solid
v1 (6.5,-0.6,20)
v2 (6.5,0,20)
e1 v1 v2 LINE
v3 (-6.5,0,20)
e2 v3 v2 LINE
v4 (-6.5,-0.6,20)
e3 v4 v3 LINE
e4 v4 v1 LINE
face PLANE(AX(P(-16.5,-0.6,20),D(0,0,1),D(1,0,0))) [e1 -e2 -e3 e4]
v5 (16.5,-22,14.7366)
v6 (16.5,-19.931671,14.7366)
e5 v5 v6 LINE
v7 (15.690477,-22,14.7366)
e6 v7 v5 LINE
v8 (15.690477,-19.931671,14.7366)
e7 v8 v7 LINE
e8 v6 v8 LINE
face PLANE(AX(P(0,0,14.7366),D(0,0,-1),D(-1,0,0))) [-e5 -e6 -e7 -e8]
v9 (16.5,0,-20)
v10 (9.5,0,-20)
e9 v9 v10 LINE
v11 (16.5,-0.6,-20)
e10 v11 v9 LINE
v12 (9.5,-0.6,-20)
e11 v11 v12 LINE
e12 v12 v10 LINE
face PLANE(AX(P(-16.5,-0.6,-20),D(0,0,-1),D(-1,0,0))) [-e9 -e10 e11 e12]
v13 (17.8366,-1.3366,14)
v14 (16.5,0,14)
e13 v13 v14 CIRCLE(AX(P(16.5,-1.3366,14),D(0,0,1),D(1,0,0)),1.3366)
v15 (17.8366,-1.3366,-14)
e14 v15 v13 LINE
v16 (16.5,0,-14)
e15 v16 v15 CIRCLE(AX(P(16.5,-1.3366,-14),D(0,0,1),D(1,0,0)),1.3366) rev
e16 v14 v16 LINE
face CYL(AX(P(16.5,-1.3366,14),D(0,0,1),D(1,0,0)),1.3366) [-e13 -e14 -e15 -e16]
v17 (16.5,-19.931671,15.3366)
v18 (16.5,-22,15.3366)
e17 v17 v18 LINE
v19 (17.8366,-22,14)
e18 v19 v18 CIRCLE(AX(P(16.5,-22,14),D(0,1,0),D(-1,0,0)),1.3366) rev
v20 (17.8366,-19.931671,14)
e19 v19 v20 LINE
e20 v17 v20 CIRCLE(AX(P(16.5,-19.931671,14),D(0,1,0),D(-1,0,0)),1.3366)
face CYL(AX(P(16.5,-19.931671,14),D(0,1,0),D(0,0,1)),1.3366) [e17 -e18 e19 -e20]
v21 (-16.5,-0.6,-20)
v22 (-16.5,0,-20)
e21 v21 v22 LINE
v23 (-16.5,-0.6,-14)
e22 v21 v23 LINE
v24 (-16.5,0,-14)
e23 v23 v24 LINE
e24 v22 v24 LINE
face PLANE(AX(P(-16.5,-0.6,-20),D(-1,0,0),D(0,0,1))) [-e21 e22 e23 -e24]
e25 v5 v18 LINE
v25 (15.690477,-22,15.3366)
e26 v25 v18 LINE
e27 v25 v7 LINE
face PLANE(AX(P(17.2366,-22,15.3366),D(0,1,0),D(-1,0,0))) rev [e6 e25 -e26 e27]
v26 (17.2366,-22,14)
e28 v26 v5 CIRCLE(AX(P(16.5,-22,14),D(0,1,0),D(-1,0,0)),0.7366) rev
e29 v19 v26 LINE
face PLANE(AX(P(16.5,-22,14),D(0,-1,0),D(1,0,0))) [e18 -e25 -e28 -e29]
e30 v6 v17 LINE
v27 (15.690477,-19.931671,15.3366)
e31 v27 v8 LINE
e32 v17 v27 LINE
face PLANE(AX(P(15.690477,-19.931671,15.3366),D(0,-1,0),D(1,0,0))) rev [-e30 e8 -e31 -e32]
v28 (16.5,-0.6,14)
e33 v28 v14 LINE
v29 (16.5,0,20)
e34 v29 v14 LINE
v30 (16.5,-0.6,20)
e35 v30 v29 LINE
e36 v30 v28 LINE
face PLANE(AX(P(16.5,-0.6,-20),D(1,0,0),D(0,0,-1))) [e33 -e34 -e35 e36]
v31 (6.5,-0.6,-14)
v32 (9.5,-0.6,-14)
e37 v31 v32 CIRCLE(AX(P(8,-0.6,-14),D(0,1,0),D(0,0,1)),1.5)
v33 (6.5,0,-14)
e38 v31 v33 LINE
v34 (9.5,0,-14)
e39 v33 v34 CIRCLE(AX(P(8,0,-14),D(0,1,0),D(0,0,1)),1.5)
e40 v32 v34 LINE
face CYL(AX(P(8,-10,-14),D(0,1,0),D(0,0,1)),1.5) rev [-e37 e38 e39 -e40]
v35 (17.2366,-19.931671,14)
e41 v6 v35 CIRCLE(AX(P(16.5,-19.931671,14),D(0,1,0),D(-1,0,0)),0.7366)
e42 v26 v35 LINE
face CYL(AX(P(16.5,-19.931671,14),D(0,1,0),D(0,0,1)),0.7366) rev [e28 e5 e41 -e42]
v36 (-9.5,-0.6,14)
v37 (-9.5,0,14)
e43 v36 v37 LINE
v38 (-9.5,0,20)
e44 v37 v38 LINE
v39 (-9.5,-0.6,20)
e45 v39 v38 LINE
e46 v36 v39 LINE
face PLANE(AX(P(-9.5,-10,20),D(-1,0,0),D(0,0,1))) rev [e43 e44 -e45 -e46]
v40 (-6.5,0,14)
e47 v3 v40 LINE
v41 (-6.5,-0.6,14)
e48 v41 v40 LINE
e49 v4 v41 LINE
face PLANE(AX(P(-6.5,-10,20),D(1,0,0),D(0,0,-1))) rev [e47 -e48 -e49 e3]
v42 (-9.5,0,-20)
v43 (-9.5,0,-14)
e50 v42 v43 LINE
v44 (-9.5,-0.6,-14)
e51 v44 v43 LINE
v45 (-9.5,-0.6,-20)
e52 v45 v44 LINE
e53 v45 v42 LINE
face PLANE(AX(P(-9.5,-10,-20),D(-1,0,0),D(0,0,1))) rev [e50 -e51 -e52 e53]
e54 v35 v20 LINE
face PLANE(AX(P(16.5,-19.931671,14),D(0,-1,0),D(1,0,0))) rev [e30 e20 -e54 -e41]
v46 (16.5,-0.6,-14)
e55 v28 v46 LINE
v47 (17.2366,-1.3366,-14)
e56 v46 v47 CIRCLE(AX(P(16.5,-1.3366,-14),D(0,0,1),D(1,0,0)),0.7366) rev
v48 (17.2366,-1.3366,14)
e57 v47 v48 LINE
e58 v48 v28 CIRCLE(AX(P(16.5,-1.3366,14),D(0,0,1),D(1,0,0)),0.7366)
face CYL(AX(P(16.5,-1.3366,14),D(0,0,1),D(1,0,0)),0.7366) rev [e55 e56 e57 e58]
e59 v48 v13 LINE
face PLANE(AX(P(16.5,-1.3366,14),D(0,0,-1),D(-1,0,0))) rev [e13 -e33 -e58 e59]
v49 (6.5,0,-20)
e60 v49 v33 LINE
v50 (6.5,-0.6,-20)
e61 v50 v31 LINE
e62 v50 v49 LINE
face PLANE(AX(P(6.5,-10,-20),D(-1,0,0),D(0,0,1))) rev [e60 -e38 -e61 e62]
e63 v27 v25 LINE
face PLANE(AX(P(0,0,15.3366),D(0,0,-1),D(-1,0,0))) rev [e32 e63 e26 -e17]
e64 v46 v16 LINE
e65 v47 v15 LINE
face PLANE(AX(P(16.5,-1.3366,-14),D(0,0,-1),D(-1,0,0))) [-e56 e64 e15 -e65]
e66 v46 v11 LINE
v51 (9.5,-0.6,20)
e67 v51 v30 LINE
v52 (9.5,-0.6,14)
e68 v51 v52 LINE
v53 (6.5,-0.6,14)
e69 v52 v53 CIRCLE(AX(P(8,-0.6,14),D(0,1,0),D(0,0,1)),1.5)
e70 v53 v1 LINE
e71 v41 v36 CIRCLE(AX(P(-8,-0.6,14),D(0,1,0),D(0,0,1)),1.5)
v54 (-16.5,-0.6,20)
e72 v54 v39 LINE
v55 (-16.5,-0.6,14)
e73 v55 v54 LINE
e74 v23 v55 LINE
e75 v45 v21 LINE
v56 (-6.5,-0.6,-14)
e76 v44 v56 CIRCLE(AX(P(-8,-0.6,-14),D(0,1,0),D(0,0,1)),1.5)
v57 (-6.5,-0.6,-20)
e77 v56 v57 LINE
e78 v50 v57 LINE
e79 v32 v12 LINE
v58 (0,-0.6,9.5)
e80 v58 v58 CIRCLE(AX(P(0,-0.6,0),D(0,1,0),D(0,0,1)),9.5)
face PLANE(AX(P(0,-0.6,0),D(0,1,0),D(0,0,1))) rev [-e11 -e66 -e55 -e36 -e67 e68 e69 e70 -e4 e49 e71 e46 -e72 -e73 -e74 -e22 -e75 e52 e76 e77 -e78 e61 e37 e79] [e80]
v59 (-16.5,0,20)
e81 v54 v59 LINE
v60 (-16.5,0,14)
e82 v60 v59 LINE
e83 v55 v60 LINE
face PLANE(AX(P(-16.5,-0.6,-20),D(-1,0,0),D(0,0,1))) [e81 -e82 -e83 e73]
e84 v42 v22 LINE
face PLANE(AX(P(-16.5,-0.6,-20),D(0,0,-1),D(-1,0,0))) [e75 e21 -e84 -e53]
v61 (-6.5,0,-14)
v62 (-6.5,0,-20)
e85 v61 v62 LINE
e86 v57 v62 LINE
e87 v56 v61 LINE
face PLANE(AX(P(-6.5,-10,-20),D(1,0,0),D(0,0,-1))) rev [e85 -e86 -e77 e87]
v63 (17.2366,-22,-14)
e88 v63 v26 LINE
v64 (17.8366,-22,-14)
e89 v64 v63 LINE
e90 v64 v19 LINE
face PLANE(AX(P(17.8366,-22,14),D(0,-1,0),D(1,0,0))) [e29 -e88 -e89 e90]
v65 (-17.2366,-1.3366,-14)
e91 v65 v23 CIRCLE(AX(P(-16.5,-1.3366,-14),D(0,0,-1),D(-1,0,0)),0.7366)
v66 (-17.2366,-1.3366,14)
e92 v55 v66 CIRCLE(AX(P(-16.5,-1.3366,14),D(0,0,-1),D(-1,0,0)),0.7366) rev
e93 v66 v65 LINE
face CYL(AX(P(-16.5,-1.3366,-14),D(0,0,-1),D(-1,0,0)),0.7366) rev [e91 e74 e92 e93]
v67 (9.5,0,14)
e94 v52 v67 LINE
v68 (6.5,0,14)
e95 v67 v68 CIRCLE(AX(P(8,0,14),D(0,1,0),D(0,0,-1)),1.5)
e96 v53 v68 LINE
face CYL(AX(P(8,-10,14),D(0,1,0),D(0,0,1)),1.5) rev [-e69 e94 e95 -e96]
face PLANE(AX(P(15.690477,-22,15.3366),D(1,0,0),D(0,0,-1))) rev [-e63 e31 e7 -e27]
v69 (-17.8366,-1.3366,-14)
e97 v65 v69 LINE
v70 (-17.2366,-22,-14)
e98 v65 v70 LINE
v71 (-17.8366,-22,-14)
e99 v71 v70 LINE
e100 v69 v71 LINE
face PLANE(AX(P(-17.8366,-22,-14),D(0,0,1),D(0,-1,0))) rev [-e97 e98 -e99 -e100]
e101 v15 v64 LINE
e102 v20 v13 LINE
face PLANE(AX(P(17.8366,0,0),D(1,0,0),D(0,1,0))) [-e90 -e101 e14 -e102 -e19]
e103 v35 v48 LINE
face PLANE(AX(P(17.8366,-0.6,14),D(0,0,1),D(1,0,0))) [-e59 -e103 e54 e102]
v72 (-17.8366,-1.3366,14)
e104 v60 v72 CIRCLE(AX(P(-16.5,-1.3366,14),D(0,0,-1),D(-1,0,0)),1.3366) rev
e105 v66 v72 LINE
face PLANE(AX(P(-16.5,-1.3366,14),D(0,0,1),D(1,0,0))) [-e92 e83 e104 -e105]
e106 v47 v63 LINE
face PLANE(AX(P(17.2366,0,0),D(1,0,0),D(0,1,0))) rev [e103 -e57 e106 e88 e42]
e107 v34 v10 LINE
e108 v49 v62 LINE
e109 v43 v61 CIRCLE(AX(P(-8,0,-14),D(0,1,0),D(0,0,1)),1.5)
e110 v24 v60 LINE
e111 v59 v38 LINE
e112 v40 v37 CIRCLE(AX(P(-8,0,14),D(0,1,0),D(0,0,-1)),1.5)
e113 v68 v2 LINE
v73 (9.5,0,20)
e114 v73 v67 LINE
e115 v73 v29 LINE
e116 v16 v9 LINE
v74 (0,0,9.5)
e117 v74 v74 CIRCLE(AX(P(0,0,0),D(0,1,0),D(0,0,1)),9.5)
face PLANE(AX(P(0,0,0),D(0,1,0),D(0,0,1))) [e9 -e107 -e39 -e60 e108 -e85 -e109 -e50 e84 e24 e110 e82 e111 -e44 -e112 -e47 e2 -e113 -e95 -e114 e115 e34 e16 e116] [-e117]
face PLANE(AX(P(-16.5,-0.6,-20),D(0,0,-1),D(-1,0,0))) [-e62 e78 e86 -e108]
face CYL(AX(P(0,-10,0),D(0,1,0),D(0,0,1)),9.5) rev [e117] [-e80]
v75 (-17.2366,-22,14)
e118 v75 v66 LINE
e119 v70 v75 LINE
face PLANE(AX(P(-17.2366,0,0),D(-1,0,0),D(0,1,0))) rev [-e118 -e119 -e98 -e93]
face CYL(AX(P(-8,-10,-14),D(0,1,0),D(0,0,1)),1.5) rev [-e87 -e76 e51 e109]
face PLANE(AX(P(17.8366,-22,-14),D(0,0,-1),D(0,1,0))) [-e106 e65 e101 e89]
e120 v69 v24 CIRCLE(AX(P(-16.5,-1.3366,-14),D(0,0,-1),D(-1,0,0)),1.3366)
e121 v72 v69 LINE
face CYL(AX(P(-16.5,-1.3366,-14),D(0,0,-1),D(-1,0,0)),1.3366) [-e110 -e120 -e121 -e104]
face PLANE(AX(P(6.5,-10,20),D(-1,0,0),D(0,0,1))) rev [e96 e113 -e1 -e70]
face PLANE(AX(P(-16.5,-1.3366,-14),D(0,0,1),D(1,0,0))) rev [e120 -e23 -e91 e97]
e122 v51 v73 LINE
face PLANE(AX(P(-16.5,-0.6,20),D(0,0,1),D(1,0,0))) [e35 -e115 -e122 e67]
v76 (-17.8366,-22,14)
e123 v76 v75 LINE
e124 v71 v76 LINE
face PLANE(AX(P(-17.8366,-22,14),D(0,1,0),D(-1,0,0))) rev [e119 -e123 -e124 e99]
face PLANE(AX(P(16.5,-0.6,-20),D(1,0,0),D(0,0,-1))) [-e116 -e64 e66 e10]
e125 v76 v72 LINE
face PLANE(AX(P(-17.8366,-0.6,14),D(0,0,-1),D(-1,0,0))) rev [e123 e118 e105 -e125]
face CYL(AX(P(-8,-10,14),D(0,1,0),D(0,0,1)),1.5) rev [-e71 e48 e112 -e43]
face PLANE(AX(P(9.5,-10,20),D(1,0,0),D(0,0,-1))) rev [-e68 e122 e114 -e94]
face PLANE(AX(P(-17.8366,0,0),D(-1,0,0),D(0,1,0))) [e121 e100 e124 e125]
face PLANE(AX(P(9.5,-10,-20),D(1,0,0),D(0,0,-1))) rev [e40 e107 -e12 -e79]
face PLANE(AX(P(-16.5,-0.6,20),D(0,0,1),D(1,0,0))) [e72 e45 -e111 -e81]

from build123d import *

# Parameters (mm, degrees)
SKETCH1_W           = 33
SKETCH1_H           = 40
BASE_FLANGE1_DEPTH  = 0.6
CUT_EXTRUDE1_DEPTH  = 10
EDGE_FLANGE1_DEPTH  = 28
SKETCH21_R          = 9.5
CUT_EXTRUDE11_DEPTH = 10
EDGE_FLANGE2_DEPTH  = 2.068329304


# Sheet-metal steps are written as plain solids
with BuildPart() as part:
    # Sketch1 → Base-Flange1 (new body)
    with BuildSketch(Plane(origin=(0, 0, 0), x_dir=(1, 0, 0), z_dir=(0, 1, 0))):
        Rectangle(SKETCH1_W, SKETCH1_H)
    extrude(amount=-BASE_FLANGE1_DEPTH)

    # Sketch6 → Cut-Extrude1 (cut)
    with BuildSketch(Plane(origin=(0, 0, 0), x_dir=(1, 0, 0), z_dir=(0, 1, 0))):
        with BuildLine():
            Line((-9.5, 20), (-9.5, 14))
            ThreePointArc((-9.5, 14), (-8, 12.5), (-6.5, 14))
            Line((-6.5, 14), (-6.5, 20))
            Line((-6.5, 20), (-9.5, 20))
        make_face()
        with BuildLine():
            Line((6.5, 20), (6.5, 14))
            ThreePointArc((6.5, 14), (8, 12.5), (9.5, 14))
            Line((9.5, 14), (9.5, 20))
            Line((9.5, 20), (6.5, 20))
        make_face()
        with BuildLine():
            Line((9.5, -20), (9.5, -14))
            ThreePointArc((9.5, -14), (8, -12.5), (6.5, -14))
            Line((6.5, -14), (6.5, -20))
            Line((6.5, -20), (9.5, -20))
        make_face()
        with BuildLine():
            Line((-9.5, -20), (-6.5, -20))
            Line((-6.5, -20), (-6.5, -14))
            ThreePointArc((-6.5, -14), (-8, -12.5), (-9.5, -14))
            Line((-9.5, -14), (-9.5, -20))
        make_face()
    extrude(amount=-CUT_EXTRUDE1_DEPTH, mode=Mode.SUBTRACT)

    # Edge-Flange1 section (across the edge) → Edge-Flange1 (add)
    with BuildSketch(Plane(origin=(17.2366, -0.6, -14), x_dir=(-1, 0, 0), z_dir=(0, 0, 1))):
        with BuildLine():
            Line((-0.6, 0.7366), (-0.6, 21.4))
            Line((-0.6, 21.4), (0, 21.4))
            Line((0, 21.4), (0, 0.7366))
            ThreePointArc((0, 0.7366), (0.215745145, 0.215745145), (0.7366, 0))
            Line((0.7366, 0), (0.7366, -0.6))
            ThreePointArc((0.7366, -0.6), (-0.208518924, -0.208518924), (-0.6, 0.7366))
        make_face()
    edge_flange1 = extrude(amount=EDGE_FLANGE1_DEPTH)

    # Mirror1: Edge-Flange1 across plane
    add(edge_flange1.mirror(Plane(origin=(0, 0, 0), x_dir=(0, 0, 1), z_dir=(1, 0, 0))))

    # Sketch21 → Cut-Extrude11 (cut)
    with BuildSketch(Plane(origin=(0, 0, 0), x_dir=(1, 0, 0), z_dir=(0, 1, 0))):
        with Locations(Location((0, 0, 0), (0, 0, 270))):
            Circle(SKETCH21_R)
    extrude(amount=-CUT_EXTRUDE11_DEPTH, mode=Mode.SUBTRACT)

    # Edge-Flange2 section (across the edge) → Edge-Flange2 (add)
    with BuildSketch(Plane(origin=(17.2366, -22, 14.7366), x_dir=(0, 0, -1), z_dir=(0, 1, 0))):
        with BuildLine():
            Line((-0.6, 0.7366), (-0.6, 1.546122954))
            Line((-0.6, 1.546122954), (0, 1.546122954))
            Line((0, 1.546122954), (0, 0.7366))
            ThreePointArc((0, 0.7366), (0.215745145, 0.215745145), (0.7366, 0))
            Line((0.7366, 0), (0.7366, -0.6))
            ThreePointArc((0.7366, -0.6), (-0.208518924, -0.208518924), (-0.6, 0.7366))
        make_face()
    extrude(amount=EDGE_FLANGE2_DEPTH)


solid = part.part
